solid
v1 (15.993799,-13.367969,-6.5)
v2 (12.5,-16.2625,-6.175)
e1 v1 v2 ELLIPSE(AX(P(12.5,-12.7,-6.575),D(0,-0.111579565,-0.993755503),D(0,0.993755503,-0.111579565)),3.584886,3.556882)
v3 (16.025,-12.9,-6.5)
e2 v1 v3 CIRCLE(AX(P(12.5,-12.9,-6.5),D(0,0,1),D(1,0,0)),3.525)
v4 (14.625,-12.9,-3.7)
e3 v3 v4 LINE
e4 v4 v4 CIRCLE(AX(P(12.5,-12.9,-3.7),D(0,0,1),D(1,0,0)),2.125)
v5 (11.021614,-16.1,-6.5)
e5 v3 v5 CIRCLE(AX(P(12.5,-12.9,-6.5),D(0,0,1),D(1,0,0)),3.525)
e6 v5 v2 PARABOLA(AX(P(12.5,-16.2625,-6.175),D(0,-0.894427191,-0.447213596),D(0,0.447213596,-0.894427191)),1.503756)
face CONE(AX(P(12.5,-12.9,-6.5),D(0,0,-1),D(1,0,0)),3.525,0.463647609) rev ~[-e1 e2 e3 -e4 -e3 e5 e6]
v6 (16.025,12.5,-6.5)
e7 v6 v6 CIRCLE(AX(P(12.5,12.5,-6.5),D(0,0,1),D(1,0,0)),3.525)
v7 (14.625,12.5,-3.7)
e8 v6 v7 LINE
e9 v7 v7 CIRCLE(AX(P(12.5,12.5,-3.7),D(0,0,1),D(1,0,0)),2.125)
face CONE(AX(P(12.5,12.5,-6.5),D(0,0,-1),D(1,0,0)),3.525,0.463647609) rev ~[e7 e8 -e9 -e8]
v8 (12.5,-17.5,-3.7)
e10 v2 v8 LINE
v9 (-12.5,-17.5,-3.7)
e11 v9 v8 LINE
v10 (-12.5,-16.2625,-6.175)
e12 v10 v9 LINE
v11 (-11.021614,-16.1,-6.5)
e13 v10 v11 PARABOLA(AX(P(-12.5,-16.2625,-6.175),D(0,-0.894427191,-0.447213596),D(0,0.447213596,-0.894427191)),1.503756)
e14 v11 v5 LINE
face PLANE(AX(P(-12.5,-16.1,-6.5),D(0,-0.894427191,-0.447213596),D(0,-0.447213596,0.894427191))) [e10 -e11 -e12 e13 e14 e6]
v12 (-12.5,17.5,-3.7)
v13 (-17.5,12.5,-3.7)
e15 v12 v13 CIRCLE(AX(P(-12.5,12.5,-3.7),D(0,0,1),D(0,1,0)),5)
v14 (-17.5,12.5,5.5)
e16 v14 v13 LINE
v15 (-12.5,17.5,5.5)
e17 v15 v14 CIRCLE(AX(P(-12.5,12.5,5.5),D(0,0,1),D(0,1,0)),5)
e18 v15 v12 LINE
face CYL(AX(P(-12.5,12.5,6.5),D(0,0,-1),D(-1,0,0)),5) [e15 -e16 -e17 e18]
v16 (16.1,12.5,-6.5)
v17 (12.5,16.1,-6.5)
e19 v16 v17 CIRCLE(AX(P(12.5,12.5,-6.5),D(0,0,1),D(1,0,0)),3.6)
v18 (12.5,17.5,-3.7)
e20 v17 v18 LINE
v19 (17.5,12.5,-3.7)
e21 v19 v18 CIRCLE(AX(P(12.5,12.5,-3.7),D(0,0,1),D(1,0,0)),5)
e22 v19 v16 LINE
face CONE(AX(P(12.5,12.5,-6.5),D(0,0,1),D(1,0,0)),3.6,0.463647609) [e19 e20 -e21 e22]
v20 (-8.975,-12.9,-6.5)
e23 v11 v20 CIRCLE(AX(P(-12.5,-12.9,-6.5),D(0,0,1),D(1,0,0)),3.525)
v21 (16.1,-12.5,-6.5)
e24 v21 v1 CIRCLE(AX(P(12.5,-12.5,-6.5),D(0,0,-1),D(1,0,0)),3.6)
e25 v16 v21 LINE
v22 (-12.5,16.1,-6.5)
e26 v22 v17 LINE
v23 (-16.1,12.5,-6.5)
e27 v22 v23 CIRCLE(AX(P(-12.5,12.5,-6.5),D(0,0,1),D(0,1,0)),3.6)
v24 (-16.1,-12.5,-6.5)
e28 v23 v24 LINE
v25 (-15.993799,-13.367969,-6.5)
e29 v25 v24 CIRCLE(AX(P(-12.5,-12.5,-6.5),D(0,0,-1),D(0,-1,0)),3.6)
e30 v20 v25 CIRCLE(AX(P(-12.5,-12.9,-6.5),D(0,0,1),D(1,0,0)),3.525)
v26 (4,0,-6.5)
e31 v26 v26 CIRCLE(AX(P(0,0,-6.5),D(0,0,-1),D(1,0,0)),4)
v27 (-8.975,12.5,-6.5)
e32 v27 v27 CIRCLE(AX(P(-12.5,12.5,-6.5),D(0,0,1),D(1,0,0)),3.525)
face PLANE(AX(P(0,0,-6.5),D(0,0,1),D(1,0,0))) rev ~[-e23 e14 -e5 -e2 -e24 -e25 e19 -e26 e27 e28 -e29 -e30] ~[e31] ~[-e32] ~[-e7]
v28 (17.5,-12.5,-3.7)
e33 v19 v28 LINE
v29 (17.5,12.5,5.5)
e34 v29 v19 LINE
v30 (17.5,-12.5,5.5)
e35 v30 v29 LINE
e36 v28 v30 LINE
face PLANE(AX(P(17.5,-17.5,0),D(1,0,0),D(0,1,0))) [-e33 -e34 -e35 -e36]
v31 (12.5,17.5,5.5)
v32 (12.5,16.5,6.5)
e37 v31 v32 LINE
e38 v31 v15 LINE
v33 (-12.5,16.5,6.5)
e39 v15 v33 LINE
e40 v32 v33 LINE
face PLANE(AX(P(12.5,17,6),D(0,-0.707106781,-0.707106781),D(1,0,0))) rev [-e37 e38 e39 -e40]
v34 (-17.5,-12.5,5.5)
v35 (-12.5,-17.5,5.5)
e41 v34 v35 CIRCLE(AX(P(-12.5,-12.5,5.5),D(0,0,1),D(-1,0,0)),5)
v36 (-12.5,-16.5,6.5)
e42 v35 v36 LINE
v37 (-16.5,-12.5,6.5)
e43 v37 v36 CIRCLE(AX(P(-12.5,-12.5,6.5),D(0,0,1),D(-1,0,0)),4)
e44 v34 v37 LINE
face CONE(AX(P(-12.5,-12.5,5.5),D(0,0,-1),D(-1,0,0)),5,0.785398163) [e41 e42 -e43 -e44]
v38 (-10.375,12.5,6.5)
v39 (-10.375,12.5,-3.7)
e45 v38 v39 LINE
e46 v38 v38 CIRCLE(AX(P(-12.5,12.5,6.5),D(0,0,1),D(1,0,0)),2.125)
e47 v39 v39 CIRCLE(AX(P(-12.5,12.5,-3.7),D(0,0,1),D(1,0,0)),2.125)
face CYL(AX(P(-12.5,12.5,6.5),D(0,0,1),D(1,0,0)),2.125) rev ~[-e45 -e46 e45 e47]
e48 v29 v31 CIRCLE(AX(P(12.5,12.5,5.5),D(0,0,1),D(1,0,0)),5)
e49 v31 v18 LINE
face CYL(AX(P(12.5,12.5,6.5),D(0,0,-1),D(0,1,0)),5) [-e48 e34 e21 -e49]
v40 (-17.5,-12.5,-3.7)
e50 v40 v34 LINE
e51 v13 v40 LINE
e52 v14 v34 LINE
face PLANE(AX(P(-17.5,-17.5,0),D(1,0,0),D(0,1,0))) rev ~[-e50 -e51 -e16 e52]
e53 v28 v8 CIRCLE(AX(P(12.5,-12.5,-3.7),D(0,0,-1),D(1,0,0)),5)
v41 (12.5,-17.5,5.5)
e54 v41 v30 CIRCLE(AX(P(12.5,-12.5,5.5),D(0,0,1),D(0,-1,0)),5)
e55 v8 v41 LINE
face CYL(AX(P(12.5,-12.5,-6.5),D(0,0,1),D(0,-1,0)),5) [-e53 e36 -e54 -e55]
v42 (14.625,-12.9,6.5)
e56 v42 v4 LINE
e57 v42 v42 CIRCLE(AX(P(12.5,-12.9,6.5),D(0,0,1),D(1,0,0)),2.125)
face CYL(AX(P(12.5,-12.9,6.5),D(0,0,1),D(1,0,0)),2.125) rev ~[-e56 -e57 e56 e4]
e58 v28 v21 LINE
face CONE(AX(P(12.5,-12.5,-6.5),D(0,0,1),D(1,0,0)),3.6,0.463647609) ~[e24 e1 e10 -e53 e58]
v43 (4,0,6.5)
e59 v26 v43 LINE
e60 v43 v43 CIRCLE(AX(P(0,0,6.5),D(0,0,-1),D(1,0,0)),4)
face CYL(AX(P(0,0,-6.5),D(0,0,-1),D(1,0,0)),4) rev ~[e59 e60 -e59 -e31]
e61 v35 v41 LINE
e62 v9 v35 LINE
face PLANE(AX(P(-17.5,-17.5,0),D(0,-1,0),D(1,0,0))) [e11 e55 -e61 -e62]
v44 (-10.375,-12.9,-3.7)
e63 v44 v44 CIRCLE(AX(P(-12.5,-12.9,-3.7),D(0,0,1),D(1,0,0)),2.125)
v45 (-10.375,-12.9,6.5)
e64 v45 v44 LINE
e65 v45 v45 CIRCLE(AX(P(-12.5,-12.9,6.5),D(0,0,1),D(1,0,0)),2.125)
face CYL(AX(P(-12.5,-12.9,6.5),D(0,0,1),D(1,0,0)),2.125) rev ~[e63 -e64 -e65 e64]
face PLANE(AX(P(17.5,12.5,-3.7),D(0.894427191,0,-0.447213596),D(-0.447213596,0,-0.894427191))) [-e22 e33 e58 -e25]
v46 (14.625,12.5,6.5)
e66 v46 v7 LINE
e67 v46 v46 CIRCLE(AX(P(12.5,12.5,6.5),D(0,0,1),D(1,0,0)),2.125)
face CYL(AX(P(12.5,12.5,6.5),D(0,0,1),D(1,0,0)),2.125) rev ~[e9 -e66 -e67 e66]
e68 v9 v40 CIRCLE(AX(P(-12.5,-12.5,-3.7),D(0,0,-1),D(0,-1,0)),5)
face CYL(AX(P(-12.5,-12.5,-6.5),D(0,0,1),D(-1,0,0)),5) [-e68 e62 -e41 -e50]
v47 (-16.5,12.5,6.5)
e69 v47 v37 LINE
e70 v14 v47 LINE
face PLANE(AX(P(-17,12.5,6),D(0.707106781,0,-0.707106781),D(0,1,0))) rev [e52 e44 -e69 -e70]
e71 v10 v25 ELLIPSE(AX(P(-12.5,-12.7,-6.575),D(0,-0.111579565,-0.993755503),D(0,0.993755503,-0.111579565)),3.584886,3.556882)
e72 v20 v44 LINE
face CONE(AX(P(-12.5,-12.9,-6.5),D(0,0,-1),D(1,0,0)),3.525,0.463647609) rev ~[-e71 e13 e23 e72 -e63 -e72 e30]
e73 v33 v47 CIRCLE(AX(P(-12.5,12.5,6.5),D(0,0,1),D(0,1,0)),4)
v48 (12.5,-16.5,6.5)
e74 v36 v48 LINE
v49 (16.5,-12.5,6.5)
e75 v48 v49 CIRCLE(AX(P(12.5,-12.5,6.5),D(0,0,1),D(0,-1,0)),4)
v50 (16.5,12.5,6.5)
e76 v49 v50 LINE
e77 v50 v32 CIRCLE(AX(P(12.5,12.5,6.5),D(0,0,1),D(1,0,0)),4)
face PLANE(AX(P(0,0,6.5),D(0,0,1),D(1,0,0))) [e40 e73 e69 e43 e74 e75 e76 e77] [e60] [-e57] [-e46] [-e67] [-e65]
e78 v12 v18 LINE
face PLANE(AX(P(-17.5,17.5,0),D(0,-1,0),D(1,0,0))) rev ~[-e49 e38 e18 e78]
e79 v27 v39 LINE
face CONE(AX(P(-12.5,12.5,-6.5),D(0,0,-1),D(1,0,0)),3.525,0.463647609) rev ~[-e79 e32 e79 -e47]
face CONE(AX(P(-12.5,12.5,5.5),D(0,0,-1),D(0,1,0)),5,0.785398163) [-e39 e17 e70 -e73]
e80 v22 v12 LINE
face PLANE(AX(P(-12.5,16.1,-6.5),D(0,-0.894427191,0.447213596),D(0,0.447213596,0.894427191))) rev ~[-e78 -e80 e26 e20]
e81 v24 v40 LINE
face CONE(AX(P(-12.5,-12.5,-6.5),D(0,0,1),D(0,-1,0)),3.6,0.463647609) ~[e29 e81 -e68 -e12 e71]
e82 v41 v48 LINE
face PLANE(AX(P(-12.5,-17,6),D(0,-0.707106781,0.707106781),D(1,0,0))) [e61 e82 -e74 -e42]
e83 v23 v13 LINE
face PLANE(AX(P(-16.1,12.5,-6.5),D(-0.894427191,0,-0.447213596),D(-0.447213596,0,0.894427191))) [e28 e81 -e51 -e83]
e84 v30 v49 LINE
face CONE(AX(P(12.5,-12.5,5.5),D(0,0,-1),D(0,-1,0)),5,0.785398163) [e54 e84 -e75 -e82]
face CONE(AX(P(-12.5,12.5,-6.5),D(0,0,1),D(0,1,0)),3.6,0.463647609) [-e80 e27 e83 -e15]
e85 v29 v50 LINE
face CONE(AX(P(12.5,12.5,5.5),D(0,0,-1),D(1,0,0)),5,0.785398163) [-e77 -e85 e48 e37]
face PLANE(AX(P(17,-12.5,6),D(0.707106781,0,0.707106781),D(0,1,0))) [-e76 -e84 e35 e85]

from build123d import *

# Parameters (mm, degrees)
F0_W         = 35
F0_H         = 35
F1_DEPTH     = 6.5
F2_R         = 2.125
F3_DEPTH     = 13.001
F4_R         = 5
F5_T1_DEPTH  = 25
F5_T3_DEPTH  = 25
F5_T12_ANGLE = 90
F5_T14_ANGLE = 90
F5_T16_ANGLE = 90
F5_T18_ANGLE = 90
F6_R         = 4
F7_DEPTH     = 13.001
F8_SIZE      = 1


# Not quite as in the source:
# - a fillet or chamfer that OpenCascade refuses, or shapes differently, is made with other operations: its cross-section is extruded or revolved along the edge and cut away or added


with BuildPart() as f1:
    # F0 (on Top) → F1 (new body, symmetric)
    with BuildSketch(Plane.XY):
        Rectangle(F0_W, F0_H)
    extrude(amount=F1_DEPTH, both=True)

    # F2 (on face) → F3 (cut, through all)
    with BuildSketch(Plane.XY.offset(6.5)):
        with Locations((-12.5, -12.9)):
            Circle(F2_R)
        with Locations((-12.5, 12.5)):
            Circle(F2_R)
        with Locations((12.5, 12.5)):
            Circle(F2_R)
        with Locations((12.5, -12.9)):
            Circle(F2_R)
    extrude(amount=-F3_DEPTH, mode=Mode.SUBTRACT)

    # F4
    f4_edges = [f1.edges().sort_by_distance(p)[0] for p in [
        (-17.5, 17.5, 0),
        (17.5, 17.5, 0),
        (17.5, -17.5, 0),
        (-17.5, -17.5, 0),
    ]]
    fillet(f4_edges, radius=F4_R)

    # F5: chamfer of 1.4 x 2.8 on 12 edges, made by hand

    # F5_s2 → F5_t1 (cut)
    with BuildSketch(Plane.XZ.offset(-12.5)):
        Polygon((17.5, -3.7), (16.1, -6.5), (17.5, -6.5), align=None)
        Polygon((-16.1, -6.5), (-17.5, -3.7), (-17.5, -6.5), align=None)
    extrude(amount=F5_T1_DEPTH, mode=Mode.SUBTRACT)

    # F5_s4 → F5_t3 (cut)
    with BuildSketch(Plane.YZ.offset(-12.5)):
        Polygon((-16.1, -6.5), (-17.5, -3.7), (-17.5, -6.5), align=None)
        Polygon((16.1, -6.5), (17.5, -3.7), (17.5, -6.5), align=None)
    extrude(amount=F5_T3_DEPTH, mode=Mode.SUBTRACT)

    # F5_s5 → F5_t6 (revolve, cut)
    with BuildSketch(Plane.XZ.offset(12.9)):
        Polygon((-8.975, -6.5), (-10.375, -3.7), (-10.375, -6.5), align=None)
    revolve(axis=Axis((-12.5, -12.9, -6.5), (0, 0, 1)), mode=Mode.SUBTRACT)

    # F5_s7 → F5_t8 (revolve, cut)
    with BuildSketch(Plane.XZ.offset(12.9)):
        Polygon((16.025, -6.5), (14.625, -3.7), (14.625, -6.5), align=None)
    revolve(axis=Axis((12.5, -12.9, -6.5), (0, 0, 1)), mode=Mode.SUBTRACT)

    # F5_s9 → F5_t10 (revolve, cut)
    with BuildSketch(Plane.XZ.offset(-12.5)):
        Polygon((16.025, -6.5), (14.625, -3.7), (14.625, -6.5), align=None)
    revolve(axis=Axis((12.5, 12.5, -6.5), (0, 0, 1)), mode=Mode.SUBTRACT)

    # F5_s11 → F5_t12 (revolve, cut)
    with BuildSketch(Plane.XZ.offset(12.5)):
        Polygon((16.1, -6.5), (17.5, -3.7), (17.5, -6.5), align=None)
    revolve(axis=Axis((12.5, -12.5, -6.5), (0, 0, -1)), revolution_arc=F5_T12_ANGLE, mode=Mode.SUBTRACT)

    # F5_s13 → F5_t14 (revolve, cut)
    with BuildSketch(Plane.XZ.offset(-12.5)):
        Polygon((16.1, -6.5), (17.5, -3.7), (17.5, -6.5), align=None)
    revolve(axis=Axis((12.5, 12.5, -6.5), (0, 0, 1)), revolution_arc=F5_T14_ANGLE, mode=Mode.SUBTRACT)

    # F5_s15 → F5_t16 (revolve, cut)
    with BuildSketch(Plane.YZ.offset(-12.5)):
        Polygon((-16.1, -6.5), (-17.5, -3.7), (-17.5, -6.5), align=None)
    revolve(axis=Axis((-12.5, -12.5, -6.5), (0, 0, -1)), revolution_arc=F5_T16_ANGLE, mode=Mode.SUBTRACT)

    # F5_s17 → F5_t18 (revolve, cut)
    with BuildSketch(Plane.YZ.offset(-12.5)):
        Polygon((16.1, -6.5), (17.5, -3.7), (17.5, -6.5), align=None)
    revolve(axis=Axis((-12.5, 12.5, -6.5), (0, 0, 1)), revolution_arc=F5_T18_ANGLE, mode=Mode.SUBTRACT)

    # F5_s19 → F5_t20 (revolve, cut)
    with BuildSketch(Plane.XZ.offset(-12.5)):
        Polygon((-8.975, -6.5), (-10.375, -3.7), (-10.375, -6.5), align=None)
    revolve(axis=Axis((-12.5, 12.5, -6.5), (0, 0, 1)), mode=Mode.SUBTRACT)

    # F6 (on face) → F7 (cut, through all)
    with BuildSketch(Plane(origin=(0, 0, -6.5), x_dir=(1, 0, 0), z_dir=(0, 0, -1))):
        Circle(F6_R)
    extrude(amount=-F7_DEPTH, mode=Mode.SUBTRACT)

    # F8
    f8_edges = [f1.edges().sort_by_distance(p)[0] for p in [
        (-16.035534, -16.035534, 6.5),
    ]]
    chamfer(f8_edges, length=F8_SIZE)


solid = f1.part
